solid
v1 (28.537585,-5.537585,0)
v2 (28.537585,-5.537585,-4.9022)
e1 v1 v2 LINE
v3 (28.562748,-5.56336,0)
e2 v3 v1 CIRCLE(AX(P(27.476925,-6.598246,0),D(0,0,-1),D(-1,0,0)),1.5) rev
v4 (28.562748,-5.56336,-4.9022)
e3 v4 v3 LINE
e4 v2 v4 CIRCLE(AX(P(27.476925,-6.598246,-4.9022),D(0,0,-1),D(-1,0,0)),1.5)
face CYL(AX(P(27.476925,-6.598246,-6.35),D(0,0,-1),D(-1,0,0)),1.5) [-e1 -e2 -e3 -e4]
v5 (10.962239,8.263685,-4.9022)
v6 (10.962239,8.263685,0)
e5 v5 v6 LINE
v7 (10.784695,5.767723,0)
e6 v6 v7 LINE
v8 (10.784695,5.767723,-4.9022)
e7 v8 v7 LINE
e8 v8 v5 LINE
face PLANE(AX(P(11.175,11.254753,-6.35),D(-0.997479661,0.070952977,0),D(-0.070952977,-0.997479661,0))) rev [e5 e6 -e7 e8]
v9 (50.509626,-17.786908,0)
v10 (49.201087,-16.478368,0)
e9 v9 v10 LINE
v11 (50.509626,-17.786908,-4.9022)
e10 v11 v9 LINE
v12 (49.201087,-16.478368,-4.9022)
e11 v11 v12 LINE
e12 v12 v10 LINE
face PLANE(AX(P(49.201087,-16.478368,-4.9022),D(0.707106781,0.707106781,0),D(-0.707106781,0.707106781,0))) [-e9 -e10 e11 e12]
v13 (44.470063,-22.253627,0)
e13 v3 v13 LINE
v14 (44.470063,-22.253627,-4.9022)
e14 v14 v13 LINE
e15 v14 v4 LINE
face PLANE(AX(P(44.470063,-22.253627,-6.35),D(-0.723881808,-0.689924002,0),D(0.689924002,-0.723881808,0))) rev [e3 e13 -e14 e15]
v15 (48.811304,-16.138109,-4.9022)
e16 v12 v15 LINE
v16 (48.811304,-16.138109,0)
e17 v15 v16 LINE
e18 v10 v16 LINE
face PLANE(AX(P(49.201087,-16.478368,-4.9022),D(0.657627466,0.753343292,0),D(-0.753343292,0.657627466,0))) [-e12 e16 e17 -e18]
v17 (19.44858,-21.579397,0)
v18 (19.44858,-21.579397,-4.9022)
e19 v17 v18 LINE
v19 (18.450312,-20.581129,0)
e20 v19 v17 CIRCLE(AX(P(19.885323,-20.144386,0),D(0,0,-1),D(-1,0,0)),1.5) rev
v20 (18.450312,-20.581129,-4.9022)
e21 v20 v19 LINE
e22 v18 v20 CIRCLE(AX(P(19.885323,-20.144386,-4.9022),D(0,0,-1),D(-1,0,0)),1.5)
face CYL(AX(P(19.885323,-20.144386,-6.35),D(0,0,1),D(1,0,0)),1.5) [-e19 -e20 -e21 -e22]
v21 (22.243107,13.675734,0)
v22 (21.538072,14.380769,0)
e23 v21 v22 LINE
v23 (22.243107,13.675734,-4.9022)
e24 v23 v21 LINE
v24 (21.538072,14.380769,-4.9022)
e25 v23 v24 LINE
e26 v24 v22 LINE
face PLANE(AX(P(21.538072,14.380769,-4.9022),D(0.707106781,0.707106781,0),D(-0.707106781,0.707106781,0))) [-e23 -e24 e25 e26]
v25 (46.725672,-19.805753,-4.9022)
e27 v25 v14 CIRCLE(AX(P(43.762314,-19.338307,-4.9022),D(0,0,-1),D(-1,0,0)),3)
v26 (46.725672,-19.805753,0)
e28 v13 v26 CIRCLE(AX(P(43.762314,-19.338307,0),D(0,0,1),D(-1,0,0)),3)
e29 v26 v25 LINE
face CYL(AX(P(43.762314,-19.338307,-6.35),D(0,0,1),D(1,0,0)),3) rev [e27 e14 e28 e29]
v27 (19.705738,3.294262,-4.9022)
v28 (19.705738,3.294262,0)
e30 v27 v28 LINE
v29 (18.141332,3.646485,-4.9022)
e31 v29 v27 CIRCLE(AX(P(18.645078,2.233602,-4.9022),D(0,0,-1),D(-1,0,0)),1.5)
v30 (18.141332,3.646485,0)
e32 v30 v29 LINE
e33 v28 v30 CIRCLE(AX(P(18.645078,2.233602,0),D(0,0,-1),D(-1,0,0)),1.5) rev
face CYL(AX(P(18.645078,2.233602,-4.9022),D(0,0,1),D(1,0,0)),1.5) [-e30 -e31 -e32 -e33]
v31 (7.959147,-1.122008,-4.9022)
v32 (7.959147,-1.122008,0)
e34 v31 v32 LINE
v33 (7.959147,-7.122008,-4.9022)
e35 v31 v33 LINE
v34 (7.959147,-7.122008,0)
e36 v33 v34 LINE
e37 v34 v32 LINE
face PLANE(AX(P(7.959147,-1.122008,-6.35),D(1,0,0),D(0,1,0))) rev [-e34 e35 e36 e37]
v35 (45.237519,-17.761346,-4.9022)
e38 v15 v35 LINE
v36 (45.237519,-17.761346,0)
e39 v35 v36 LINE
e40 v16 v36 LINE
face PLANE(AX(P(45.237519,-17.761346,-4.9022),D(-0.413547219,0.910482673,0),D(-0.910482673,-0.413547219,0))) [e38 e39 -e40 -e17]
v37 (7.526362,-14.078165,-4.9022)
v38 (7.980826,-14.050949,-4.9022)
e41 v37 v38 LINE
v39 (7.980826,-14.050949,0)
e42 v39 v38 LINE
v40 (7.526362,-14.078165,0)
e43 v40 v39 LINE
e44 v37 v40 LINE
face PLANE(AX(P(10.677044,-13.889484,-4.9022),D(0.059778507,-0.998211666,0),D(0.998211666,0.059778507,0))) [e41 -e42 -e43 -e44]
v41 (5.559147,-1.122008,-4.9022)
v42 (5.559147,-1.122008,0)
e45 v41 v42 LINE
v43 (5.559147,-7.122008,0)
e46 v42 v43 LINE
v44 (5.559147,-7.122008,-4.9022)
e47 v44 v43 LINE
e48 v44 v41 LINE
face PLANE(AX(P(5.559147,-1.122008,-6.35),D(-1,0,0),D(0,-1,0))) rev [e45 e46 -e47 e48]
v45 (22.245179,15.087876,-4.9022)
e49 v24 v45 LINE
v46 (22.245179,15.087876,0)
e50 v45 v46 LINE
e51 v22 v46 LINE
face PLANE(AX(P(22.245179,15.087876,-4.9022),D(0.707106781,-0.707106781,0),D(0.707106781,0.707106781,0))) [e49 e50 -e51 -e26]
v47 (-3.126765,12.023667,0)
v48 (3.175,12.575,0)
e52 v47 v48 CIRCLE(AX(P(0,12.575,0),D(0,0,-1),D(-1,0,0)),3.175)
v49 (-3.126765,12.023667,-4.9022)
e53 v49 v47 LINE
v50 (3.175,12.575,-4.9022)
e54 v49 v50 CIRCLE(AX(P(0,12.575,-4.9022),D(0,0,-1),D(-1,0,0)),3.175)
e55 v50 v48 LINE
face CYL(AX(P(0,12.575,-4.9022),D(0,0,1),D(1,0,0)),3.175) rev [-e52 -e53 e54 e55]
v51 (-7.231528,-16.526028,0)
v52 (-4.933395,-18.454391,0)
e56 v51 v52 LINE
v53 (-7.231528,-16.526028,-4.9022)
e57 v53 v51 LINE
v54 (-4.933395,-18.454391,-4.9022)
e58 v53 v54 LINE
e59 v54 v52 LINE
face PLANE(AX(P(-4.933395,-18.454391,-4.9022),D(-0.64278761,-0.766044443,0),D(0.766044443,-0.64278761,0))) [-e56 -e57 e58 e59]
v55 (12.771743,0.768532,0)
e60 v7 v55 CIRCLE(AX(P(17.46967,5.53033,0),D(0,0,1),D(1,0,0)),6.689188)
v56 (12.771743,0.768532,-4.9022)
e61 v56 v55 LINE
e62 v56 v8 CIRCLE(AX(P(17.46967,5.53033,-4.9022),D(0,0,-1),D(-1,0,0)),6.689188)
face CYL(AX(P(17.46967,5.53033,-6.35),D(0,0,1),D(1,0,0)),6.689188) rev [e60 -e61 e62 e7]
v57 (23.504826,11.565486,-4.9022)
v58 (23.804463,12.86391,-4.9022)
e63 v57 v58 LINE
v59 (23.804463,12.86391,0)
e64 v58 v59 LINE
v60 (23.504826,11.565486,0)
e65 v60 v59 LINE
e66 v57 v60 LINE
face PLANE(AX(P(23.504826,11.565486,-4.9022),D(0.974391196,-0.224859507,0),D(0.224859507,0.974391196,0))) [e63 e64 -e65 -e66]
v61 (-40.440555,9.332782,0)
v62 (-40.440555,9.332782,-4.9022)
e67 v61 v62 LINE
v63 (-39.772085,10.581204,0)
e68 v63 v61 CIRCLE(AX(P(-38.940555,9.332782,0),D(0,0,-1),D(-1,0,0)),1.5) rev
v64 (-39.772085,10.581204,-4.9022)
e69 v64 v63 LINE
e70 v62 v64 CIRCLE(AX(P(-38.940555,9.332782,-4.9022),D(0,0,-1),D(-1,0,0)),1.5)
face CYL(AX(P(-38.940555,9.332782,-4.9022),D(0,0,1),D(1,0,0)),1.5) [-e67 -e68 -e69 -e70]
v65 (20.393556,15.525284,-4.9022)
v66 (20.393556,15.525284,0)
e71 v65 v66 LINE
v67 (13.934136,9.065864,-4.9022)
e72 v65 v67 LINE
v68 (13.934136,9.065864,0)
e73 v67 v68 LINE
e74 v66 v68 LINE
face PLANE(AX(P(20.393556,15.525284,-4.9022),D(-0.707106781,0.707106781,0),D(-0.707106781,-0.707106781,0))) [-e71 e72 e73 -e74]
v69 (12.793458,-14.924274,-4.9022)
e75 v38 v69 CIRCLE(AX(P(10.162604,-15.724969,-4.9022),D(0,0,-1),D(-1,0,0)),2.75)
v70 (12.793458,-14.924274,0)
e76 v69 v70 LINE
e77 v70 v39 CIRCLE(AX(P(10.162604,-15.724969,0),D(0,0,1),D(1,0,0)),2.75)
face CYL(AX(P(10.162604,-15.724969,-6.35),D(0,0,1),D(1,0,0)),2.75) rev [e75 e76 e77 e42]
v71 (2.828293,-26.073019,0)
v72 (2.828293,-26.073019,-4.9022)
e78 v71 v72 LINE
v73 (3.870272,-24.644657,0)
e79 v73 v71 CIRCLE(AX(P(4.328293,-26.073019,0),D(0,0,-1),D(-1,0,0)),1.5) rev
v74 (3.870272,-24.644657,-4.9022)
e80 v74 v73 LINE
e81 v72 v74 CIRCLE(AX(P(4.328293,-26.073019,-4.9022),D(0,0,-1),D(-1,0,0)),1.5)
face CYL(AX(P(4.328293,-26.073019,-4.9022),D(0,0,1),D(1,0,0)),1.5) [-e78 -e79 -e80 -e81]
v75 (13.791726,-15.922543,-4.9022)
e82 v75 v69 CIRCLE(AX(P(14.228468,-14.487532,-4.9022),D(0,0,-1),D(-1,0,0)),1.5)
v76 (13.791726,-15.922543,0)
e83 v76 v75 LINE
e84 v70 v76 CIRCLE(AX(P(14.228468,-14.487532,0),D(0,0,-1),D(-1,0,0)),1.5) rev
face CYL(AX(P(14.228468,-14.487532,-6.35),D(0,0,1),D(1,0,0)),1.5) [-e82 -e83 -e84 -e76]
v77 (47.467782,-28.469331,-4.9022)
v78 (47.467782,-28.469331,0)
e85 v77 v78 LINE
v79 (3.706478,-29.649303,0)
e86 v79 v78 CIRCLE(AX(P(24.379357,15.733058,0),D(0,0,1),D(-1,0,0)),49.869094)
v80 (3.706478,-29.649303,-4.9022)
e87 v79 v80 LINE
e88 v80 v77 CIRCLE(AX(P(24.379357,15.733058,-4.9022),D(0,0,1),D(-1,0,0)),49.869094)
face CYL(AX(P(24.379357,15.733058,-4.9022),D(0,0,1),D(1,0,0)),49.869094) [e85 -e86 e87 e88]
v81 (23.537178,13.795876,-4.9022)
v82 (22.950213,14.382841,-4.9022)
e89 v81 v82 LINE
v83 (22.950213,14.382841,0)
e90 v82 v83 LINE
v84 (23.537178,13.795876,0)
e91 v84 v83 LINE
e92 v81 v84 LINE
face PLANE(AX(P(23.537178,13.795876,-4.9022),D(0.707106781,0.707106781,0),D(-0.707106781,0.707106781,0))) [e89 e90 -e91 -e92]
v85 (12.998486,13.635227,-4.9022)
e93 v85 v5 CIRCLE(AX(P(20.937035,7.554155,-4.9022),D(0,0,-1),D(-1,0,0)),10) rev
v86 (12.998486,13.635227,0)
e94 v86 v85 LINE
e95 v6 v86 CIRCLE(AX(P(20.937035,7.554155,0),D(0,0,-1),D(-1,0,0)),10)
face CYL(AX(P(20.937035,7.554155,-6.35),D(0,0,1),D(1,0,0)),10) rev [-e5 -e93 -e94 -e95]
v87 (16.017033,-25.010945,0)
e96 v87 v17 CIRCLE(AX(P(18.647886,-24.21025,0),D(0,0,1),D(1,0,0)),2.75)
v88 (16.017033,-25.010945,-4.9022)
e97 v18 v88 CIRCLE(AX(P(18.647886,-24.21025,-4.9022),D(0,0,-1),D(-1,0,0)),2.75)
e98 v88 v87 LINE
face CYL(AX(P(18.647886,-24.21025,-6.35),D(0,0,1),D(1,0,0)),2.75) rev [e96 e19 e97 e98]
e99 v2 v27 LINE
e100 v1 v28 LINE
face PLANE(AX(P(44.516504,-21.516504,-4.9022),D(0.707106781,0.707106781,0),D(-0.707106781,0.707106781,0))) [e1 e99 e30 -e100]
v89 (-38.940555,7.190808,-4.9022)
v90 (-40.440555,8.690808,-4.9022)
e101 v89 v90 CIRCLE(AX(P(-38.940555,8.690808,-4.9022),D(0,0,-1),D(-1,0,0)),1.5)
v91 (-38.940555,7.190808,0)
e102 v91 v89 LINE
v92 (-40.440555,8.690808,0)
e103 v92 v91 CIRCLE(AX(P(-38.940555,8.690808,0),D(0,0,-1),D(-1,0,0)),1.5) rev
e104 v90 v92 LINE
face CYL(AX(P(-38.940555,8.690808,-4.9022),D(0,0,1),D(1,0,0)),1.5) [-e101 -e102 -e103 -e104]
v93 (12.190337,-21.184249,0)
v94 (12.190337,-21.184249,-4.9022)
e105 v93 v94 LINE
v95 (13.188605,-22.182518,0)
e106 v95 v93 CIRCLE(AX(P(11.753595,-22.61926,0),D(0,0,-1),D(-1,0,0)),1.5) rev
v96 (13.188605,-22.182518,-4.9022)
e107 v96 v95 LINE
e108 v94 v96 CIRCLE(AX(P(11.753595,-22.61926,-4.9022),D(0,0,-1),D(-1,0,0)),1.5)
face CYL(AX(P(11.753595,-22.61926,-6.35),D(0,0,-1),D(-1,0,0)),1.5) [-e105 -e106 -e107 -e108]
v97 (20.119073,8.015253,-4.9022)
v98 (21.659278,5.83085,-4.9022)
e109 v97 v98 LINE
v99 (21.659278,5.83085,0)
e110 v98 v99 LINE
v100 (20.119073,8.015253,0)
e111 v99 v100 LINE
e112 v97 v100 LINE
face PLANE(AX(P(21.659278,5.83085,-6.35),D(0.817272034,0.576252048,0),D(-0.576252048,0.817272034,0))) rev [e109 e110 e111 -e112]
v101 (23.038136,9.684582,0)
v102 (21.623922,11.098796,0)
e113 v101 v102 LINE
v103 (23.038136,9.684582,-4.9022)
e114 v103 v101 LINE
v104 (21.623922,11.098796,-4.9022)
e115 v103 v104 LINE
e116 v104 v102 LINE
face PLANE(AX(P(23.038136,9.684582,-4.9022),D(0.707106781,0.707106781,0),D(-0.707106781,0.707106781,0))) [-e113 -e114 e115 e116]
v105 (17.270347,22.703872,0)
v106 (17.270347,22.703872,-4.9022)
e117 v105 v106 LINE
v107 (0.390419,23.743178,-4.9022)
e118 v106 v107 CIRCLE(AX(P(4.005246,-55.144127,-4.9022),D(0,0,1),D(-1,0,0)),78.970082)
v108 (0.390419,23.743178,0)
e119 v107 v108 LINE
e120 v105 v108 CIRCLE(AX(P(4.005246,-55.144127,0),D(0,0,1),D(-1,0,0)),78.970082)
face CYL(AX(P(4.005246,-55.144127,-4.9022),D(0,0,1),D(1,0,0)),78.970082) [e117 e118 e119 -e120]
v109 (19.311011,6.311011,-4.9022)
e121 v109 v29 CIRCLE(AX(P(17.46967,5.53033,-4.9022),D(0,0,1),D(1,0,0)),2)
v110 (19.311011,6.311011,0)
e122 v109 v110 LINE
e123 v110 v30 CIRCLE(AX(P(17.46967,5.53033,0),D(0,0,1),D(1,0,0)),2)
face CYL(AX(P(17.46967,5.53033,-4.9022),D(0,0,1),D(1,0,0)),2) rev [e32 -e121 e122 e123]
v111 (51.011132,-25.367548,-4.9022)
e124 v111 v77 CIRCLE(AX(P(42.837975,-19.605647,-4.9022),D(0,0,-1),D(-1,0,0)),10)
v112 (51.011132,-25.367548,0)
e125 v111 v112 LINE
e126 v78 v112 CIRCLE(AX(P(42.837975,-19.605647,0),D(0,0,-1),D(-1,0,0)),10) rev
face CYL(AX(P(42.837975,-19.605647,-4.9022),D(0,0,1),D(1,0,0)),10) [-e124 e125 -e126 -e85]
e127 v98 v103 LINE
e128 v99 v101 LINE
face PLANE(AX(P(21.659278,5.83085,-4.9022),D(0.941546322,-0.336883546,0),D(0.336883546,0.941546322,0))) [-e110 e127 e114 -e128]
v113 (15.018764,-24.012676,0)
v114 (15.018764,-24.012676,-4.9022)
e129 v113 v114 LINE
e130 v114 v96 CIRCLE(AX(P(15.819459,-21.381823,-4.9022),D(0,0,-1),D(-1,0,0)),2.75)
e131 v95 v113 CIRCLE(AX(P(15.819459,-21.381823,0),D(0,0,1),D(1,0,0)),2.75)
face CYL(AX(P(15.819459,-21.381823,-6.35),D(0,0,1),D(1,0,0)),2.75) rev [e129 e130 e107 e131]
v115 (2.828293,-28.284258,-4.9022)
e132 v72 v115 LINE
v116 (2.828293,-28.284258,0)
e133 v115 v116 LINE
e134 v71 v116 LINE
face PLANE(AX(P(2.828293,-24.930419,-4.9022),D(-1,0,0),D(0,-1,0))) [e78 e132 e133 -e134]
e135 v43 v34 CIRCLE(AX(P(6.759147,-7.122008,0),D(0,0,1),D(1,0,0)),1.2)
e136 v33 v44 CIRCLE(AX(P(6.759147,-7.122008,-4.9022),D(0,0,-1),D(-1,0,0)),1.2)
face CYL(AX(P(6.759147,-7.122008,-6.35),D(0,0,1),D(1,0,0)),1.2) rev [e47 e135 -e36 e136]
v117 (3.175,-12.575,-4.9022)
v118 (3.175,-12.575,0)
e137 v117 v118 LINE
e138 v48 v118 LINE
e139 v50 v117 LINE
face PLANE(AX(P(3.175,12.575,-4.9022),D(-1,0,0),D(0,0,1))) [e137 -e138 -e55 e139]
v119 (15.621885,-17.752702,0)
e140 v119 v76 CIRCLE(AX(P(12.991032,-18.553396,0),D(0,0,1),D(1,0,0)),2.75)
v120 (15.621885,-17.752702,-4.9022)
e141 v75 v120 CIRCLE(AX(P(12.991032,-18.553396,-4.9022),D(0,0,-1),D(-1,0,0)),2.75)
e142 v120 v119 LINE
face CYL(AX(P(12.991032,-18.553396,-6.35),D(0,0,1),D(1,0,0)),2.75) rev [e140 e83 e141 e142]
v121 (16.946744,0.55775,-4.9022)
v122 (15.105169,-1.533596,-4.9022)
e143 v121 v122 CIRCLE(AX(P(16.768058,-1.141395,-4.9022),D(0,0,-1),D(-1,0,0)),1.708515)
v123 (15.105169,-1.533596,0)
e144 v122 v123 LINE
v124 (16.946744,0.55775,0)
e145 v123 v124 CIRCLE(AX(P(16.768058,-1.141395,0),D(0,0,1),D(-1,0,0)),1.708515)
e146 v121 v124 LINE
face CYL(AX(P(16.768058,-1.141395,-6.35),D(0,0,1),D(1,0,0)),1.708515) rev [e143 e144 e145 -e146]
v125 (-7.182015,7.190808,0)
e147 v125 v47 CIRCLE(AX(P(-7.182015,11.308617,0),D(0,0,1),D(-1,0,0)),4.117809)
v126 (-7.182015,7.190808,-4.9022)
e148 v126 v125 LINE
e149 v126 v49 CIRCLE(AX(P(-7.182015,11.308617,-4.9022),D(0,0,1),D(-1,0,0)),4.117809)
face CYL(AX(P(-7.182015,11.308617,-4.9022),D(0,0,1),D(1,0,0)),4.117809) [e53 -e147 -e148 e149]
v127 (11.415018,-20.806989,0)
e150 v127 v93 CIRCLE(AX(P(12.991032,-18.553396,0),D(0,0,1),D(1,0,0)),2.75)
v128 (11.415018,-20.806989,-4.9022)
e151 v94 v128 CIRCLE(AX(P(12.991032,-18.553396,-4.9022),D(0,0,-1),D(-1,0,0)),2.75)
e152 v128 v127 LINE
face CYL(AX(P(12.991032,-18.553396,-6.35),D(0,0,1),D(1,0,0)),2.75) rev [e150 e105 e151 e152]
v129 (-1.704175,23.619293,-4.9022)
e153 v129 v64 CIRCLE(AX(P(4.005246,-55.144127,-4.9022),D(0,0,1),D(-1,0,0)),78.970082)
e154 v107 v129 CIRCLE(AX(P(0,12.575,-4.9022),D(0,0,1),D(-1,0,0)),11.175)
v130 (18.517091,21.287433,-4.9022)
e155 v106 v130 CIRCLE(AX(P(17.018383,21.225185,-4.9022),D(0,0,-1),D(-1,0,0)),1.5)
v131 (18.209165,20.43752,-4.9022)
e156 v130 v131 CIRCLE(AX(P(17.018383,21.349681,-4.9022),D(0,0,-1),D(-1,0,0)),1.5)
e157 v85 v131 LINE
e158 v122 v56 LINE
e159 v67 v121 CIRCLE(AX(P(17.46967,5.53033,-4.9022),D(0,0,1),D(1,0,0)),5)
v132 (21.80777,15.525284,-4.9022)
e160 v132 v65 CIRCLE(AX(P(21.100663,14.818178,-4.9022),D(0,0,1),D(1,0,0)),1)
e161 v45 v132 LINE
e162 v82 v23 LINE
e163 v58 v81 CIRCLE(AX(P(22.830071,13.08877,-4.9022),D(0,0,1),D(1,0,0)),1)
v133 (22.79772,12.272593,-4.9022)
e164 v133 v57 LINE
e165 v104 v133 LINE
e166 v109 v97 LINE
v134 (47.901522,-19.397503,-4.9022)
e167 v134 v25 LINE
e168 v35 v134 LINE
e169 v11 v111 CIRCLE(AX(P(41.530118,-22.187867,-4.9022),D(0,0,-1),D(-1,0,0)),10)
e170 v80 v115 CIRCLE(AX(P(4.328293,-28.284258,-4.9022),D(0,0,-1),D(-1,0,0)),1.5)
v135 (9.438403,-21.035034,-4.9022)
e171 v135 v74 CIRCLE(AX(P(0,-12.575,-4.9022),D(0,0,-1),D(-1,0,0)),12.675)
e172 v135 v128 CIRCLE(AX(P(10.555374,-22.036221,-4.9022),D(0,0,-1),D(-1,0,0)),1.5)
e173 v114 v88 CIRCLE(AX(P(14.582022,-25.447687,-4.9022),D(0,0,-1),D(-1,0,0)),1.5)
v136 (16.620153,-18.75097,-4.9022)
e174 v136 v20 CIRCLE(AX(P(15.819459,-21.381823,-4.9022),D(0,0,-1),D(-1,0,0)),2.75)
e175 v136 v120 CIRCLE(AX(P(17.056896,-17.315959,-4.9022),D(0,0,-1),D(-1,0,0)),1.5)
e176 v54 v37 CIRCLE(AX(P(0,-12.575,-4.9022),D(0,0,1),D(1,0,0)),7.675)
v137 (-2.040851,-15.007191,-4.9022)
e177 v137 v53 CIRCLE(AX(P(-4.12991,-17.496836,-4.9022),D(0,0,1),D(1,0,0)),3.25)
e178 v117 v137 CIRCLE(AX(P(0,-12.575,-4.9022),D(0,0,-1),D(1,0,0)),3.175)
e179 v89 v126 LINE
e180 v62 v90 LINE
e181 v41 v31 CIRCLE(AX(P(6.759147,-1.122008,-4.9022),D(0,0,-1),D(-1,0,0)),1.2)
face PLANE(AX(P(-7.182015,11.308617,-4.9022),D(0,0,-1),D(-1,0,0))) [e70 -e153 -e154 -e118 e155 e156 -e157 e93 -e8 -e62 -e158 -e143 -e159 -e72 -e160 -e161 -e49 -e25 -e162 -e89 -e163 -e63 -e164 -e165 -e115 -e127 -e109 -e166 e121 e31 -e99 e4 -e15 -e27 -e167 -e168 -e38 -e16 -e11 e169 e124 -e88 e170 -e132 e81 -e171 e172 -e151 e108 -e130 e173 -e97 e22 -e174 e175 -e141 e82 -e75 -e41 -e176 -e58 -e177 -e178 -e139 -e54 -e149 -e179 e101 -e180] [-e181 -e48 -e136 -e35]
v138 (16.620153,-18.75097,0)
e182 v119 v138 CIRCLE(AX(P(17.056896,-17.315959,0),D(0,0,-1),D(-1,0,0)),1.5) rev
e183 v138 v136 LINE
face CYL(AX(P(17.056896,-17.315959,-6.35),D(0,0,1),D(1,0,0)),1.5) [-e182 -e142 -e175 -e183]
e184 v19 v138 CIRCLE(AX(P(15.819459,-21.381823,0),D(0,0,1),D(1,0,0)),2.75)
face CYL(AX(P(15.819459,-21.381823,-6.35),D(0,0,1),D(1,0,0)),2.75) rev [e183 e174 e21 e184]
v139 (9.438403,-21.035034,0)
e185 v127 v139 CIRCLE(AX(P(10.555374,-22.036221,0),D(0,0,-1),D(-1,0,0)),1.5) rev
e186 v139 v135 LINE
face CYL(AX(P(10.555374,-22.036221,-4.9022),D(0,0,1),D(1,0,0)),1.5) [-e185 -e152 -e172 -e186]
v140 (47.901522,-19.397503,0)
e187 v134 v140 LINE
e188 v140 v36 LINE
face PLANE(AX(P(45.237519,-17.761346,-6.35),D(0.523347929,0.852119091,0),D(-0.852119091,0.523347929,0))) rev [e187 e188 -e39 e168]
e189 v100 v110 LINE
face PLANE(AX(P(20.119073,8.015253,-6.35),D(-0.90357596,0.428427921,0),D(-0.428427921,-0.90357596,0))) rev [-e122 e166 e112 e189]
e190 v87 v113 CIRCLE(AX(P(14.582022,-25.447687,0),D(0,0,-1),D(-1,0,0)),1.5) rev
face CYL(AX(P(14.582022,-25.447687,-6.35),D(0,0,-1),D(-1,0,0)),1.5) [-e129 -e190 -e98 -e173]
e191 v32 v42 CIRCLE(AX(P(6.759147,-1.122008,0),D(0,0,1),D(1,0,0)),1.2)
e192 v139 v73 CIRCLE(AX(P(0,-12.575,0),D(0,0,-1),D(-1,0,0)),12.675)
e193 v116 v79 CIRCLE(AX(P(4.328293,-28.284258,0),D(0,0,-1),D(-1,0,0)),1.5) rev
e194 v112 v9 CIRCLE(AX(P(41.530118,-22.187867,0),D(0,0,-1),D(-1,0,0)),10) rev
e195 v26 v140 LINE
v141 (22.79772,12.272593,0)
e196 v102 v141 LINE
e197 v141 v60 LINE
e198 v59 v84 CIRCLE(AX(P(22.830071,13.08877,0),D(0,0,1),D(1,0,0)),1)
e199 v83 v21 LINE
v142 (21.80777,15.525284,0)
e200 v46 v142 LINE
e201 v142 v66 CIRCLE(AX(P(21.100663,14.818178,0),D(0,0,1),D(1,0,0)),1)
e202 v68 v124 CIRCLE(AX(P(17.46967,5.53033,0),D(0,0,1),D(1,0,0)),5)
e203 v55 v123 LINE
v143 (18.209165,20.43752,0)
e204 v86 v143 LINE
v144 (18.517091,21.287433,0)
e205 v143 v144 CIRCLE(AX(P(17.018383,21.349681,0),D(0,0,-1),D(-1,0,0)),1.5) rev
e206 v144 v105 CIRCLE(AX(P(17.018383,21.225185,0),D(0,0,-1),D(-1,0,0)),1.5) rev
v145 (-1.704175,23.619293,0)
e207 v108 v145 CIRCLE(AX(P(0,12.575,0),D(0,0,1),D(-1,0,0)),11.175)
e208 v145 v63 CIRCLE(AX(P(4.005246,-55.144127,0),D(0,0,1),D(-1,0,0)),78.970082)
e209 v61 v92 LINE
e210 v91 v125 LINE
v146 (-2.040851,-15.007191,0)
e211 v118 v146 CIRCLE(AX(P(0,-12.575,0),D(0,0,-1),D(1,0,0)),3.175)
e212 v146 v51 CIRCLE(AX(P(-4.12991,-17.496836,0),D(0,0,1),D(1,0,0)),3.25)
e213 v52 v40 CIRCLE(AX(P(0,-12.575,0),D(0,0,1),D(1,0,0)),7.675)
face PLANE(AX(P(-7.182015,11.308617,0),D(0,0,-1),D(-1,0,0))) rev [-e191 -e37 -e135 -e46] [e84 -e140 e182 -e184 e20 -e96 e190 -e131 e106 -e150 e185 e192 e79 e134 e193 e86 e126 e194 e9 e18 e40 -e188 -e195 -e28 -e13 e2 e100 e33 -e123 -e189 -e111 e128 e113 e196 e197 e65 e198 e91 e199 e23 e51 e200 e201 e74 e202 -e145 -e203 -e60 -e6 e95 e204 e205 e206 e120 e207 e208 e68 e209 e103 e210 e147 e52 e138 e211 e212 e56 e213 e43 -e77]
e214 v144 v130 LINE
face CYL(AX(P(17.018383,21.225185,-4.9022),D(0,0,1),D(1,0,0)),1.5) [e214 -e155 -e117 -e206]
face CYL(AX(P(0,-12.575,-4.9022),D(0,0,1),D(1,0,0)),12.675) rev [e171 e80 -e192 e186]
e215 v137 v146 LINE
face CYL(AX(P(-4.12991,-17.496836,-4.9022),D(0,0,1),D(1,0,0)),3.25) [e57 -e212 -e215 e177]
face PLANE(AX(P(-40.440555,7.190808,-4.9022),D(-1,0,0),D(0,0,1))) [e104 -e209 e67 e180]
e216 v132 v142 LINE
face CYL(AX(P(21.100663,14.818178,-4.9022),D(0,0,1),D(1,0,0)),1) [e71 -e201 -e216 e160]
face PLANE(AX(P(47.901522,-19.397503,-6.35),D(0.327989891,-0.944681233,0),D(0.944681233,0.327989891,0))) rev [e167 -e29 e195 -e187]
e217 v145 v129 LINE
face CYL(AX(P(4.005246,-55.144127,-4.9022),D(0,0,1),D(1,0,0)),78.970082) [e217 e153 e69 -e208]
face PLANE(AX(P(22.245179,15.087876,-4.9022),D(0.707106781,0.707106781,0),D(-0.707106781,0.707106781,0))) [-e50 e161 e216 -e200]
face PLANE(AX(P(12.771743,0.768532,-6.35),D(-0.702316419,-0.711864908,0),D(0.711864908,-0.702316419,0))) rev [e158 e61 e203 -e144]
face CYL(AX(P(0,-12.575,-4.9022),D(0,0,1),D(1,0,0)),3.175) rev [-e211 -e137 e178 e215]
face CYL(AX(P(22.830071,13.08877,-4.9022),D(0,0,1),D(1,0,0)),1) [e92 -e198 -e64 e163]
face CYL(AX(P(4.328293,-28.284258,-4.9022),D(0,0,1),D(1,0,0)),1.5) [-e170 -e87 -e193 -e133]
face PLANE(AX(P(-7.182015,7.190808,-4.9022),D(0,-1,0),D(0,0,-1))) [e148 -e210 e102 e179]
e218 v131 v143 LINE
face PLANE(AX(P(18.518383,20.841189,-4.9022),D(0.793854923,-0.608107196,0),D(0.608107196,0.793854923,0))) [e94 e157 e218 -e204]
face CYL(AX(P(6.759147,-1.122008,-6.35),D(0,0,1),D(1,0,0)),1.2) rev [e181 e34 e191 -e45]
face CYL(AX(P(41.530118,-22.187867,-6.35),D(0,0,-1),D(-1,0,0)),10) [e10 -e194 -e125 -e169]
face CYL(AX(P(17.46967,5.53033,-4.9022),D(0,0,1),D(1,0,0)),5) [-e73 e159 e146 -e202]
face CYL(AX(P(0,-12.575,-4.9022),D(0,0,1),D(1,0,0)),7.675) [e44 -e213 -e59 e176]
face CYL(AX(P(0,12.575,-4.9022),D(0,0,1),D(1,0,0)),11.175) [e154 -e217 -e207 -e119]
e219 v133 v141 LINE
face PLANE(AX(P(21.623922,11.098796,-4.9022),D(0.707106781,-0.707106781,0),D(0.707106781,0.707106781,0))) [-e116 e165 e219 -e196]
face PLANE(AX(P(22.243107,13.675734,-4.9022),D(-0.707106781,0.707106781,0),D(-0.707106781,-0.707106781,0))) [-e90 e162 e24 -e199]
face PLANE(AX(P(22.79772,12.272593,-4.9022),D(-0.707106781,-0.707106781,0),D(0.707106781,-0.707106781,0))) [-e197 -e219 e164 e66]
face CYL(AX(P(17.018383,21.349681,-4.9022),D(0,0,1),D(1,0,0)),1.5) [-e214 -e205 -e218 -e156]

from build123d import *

# Parameters (mm, degrees)
CART_CLIP_DEPTH                    = 4.9022
DEVICE_CLIP_DEPTH                  = 4.9022
JOINT_DEPTH                        = 4.9022
JOINT_FILLETS_R                    = 1
DEVICE_CLIP_FLEX_RELIEF_GEOMETRY_R = 2
DEVICE_CLIP_FLEX_RELIEF_DEPTH      = 62.785838519
SNAP_IN_RELIEF_DEPTH               = 6.35
BOTTOM_BEEFUP_DEPTH                = 4.9022
CABLE_HOLE_R                       = 2.75
CABLE_HOLE_CUT_DEPTH               = 6.35
SHELF_TAIL_DEPTH                   = 4.9022
FRONT_TAB_BEEF_DEPTH               = 4.9022
TOP_CURVE_EXTRUSION_DEPTH          = 4.9022
LPATTERN1_COUNT                    = 4
LPATTERN1_PITCH                    = 4
POSCON_BOTTOM_SNAPBEEF_DEPTH       = 4.9022
POSCON_TOP_CLIP_FLEX_RELIEF_DEPTH  = 6.35
ZIP_TIE_SLOT_DEPTH                 = 6.35
POSCON_BOTTOM_SNAP_RELIEF_DEPTH    = 6.35
SMALL_FILLET_R                     = 1.5
POSCON_TOP_SNAP_RELIEF_DEPTH       = 6.35
LARGE_FILLET_R                     = 10


with BuildPart() as part:
    # Cart Clip Geometry → Cart Clip (new body)
    with BuildSketch(Plane.XY):
        with BuildLine():
            Line((11.175, 4.575), (7.675, -8.575))
            Line((7.675, -8.575), (7.675, -12.575))
            ThreePointArc((7.675, -12.575), (3.243595159, -19.530912266), (-4.933394904, -18.454391101))
            Line((-4.933394904, -18.454391101), (-7.231528234, -16.526028272))
            ThreePointArc((-7.231528234, -16.526028272), (-5.042617938, -14.377626523), (-2.040850661, -15.007191107))
            ThreePointArc((-2.040850661, -15.007191107), (1.341812981, -15.452527224), (3.175, -12.575))
            Line((3.175, -12.575), (3.175, 12.575))
            ThreePointArc((3.175, 12.575), (-0.276719483, 15.737918166), (-3.126764616, 12.023667036))
            ThreePointArc((-3.126764616, 12.023667036), (-5.791346514, 7.43274359), (-10.766819067, 9.282405083))
            Line((-10.766819067, 9.282405083), (-11.00522664, 10.634481615))
            ThreePointArc((-11.00522664, 10.634481615), (-0.973965425, 23.707475751), (11.175, 12.575))
            Line((11.175, 12.575), (11.175, 4.575))
        make_face()
    extrude(amount=-CART_CLIP_DEPTH)



with BuildPart() as body_2:
    # Device Clip Geometry → Device Clip (new body)
    with BuildSketch(Plane.XY):
        with BuildLine():
            Line((22.245178849, 15.087875605), (21.538072068, 14.380768824))
            Line((21.538072068, 14.380768824), (22.243106562, 13.67573433))
            Line((22.243106562, 13.67573433), (22.950213344, 14.382841111))
            Line((22.950213344, 14.382841111), (23.537178094, 13.79587636))
            ThreePointArc((23.537178094, 13.79587636), (23.791320059, 13.364452092), (23.804462509, 12.863910072))
            Line((23.804462509, 12.863910072), (23.504826292, 11.565486463))
            Line((23.504826292, 11.565486463), (22.79771951, 12.272593245))
            Line((22.79771951, 12.272593245), (21.623922254, 11.098795988))
            Line((21.623922254, 11.098795988), (23.038135816, 9.684582425))
            Line((23.038135816, 9.684582425), (21.659277593, 5.830850468))
            Line((21.659277593, 5.830850468), (20.24506403, 7.24506403))
            Line((20.24506403, 7.24506403), (18, 5))
            Line((18, 5), (44.516504294, -21.516504294))
            Line((44.516504294, -21.516504294), (46.761568325, -19.271440264))
            Line((46.761568325, -19.271440264), (45.347354762, -17.857226702))
            Line((45.347354762, -17.857226702), (49.20108672, -16.478368479))
            Line((49.20108672, -16.478368479), (50.615300282, -17.892582041))
            Line((50.615300282, -17.892582041), (51.789097539, -16.718784784))
            Line((51.789097539, -16.718784784), (51.081990758, -16.011678003))
            Line((51.081990758, -16.011678003), (52.380414367, -15.712041786))
            ThreePointArc((52.380414367, -15.712041786), (52.880956387, -15.725184235), (53.312380655, -15.9793262))
            Line((53.312380655, -15.9793262), (53.899345406, -16.566290951))
            Line((53.899345406, -16.566290951), (53.192238624, -17.273397732))
            Line((53.192238624, -17.273397732), (53.897273119, -17.978432226))
            Line((53.897273119, -17.978432226), (54.6043799, -17.271325445))
            Line((54.6043799, -17.271325445), (55.041788732, -17.708734278))
            ThreePointArc((55.041788732, -17.708734278), (55.334681951, -18.415841059), (55.041788732, -19.12294784))
            Line((55.041788732, -19.12294784), (48.582368286, -25.582368286))
            ThreePointArc((48.582368286, -25.582368286), (45.04683438, -27.04683438), (41.511300474, -25.582368286))
            Line((41.511300474, -25.582368286), (13.934136008, 1.99479618))
            ThreePointArc((13.934136008, 1.99479618), (12.469669914, 5.530330086), (13.934136008, 9.065863992))
            Line((13.934136008, 9.065863992), (20.393556454, 15.525284438))
            ThreePointArc((20.393556454, 15.525284438), (21.100663236, 15.818177657), (21.807770017, 15.525284438))
            Line((21.807770017, 15.525284438), (22.245178849, 15.087875605))
        make_face()
    extrude(amount=-DEVICE_CLIP_DEPTH)


with BuildPart() as part_1:
    add(part.part)

    add(body_2.part)  # Joint merges body 2
    # Joint Geometry → Joint (add)
    with BuildSketch(Plane.XY):
        Polygon((7.675, -8.575), (41.511300474, -25.582368286), (13.934136008, 1.99479618), (11.175, 4.575), align=None)
    extrude(amount=-JOINT_DEPTH)

    # joint fillets
    # the kernel refuses this fillet: 1 mm, written as the material it adds along each edge
    with BuildSketch(Plane(origin=(7.675, -8.575, 0), x_dir=(0.8934828469815188, -0.4490973192413867, 0), z_dir=(0, 0, -1))) as joint_fillets_piece_1:
        with BuildLine():
            CenterArc((JOINT_FILLETS_R * 1.62185242183, JOINT_FILLETS_R), JOINT_FILLETS_R, 153.314216372, 116.685783628)
            Line((JOINT_FILLETS_R * 0.728369574849, JOINT_FILLETS_R * 1.44909731924), (0, 0))
            Line((0, 0), (JOINT_FILLETS_R * 1.62185242183, 0))
        make_face()
    extrude(amount=4.9022)
    with BuildSketch(Plane(origin=(41.511300474, -25.582368286, 0), x_dir=(-0.8934828469815294, 0.44909731924136564, 0), z_dir=(0, 0, -1))) as joint_fillets_piece_2:
        with BuildLine():
            CenterArc((0.153680417, -1), JOINT_FILLETS_R, 90, 16.706554242)
            ThreePointArc((-0.133789669, -0.042210383), (-0.066746785, -0.02157445), (0, 0))
            Line((0, 0), (0.153680417, 0))
        make_face()
    extrude(amount=4.9022)
    with BuildSketch(Plane(origin=(13.934136008, 1.99479618, 0), x_dir=(-0.7303933527208794, 0.6830267566509771, 0), z_dir=(0, 0, -1))) as joint_fillets_piece_3:
        with BuildLine():
            CenterArc((4.307177284, 1), JOINT_FILLETS_R, 138.225615508, 131.774384492)
            ThreePointArc((3.561403369, 1.66619912), (1.95135729, 0.468333164), (0, 0))
            Line((0, 0), (4.307177284, 0))
        make_face()
    extrude(amount=4.9022)
    with BuildSketch(Plane(origin=(11.175, 4.575, 0), x_dir=(0, 1, 0), z_dir=(0, 0, -1))) as joint_fillets_piece_4:
        with BuildLine():
            CenterArc((JOINT_FILLETS_R * 0.43397607901, JOINT_FILLETS_R), JOINT_FILLETS_R, 223.080619659, 46.919380341)
            Line((-JOINT_FILLETS_R * 0.296417273711, JOINT_FILLETS_R * 0.316973243349), (0, 0))
            Line((0, 0), (JOINT_FILLETS_R * 0.43397607901, 0))
        make_face()
    extrude(amount=4.9022)

    # Device Clip Flex Relief Geometry → Device Clip Flex Relief (cut, through all)
    with BuildSketch(Plane.XY):
        with Locations((17.469669914, 5.530330086)):
            Circle(DEVICE_CLIP_FLEX_RELIEF_GEOMETRY_R)
    extrude(amount=-DEVICE_CLIP_FLEX_RELIEF_DEPTH, mode=Mode.SUBTRACT)

    # Sketch5 → SNAP IN RELIEF (cut)
    with BuildSketch(Plane.XY):
        with BuildLine():
            Line((44.470063399, -22.25362726), (28.550321446, -5.550321446))
            Line((28.550321446, -5.550321446), (46.761568325, -19.271440264))
            ThreePointArc((46.761568325, -19.271440264), (46.141143244, -21.16619399), (44.470063399, -22.25362726))
        make_face()
    extrude(amount=-SNAP_IN_RELIEF_DEPTH, mode=Mode.SUBTRACT)

    # BOTTOM BEEFUP SKETCH → BOTTOM BEEFUP (add)
    with BuildSketch(Plane.XY):
        with BuildLine():
            Line((10.677043667, -13.889484035), (7.526361766, -14.078164518))
            Line((7.526361766, -14.078164518), (7.208614318, -8.772257329))
            Line((7.208614318, -8.772257329), (10.675, -9.282514389))
            Line((10.675, -9.282514389), (44.278748713, -25.488746112))
            Line((44.278748713, -25.488746112), (53.899345406, -16.566290951))
            Line((53.899345406, -16.566290951), (55.041788732, -17.708734278))
            ThreePointArc((55.041788732, -17.708734278), (55.966427661, -19.737585883), (55.333281386, -21.875416975))
            Line((55.333281386, -21.875416975), (50.398436239, -26.810262122))
            ThreePointArc((50.398436239, -26.810262122), (26.922067406, -34.071170743), (2.828292768, -29.238913377))
            Line((2.828292768, -29.238913377), (2.828292768, -24.930419257))
            ThreePointArc((2.828292768, -24.930419257), (8.371790669, -22.091761318), (11.894021473, -16.955397036))
            Line((11.894021473, -16.955397036), (10.677043667, -13.889484035))
        make_face()
    extrude(amount=-BOTTOM_BEEFUP_DEPTH)

    # CABLE HOLE → CABLE HOLE CUT (cut)
    with BuildSketch(Plane.XY):
        with Locations((10.162604388, -15.724968902)):
            Circle(CABLE_HOLE_R)
    cable_hole_cut = extrude(amount=-CABLE_HOLE_CUT_DEPTH, mode=Mode.SUBTRACT)

    # BOX SLIDE BEEF → SHELF TAIL (add)
    with BuildSketch(Plane.XY):
        Polygon((-7.182015159, 7.190807632), (-40.440555285, 7.190807632), (-40.440555285, 10.131018627), (-4.155347731, 22.948702822), align=None)
    extrude(amount=-SHELF_TAIL_DEPTH)

    # BEHIND TOP CLIP BEEF SKETCH → FRONT TAB BEEF (add)
    with BuildSketch(Plane.XY):
        Polygon((18.518382836, 20.841188896), (11.175, 11.254753066), (0.590090247, 23.734409415), (18.518382836, 22.48088631), align=None)
    extrude(amount=-FRONT_TAB_BEEF_DEPTH)

    # TOP CURVE → TOP CURVE EXTRUSION (add)
    with BuildSketch(Plane.XY):
        with BuildLine():
            Line((-40.440555285, 10.131018627), (-38.751141722, 8.751938886))
            Line((-38.751141722, 8.751938886), (0, 16.86846238))
            Line((0, 16.86846238), (13.175622622, 16.86846238))
            Line((13.175622622, 16.86846238), (18.518382836, 22.48088631))
            ThreePointArc((18.518382836, 22.48088631), (-12.184902527, 22.148517873), (-40.440555285, 10.131018627))
        make_face()
    extrude(amount=-TOP_CURVE_EXTRUSION_DEPTH)

    # LPattern1: CABLE HOLE CUT ×4
    with Locations(*[Vector(0.7071067811865482, -0.7071067811865469, 0) * (i * LPATTERN1_PITCH) for i in range(1, LPATTERN1_COUNT)]):
        add(cable_hole_cut, mode=Mode.SUBTRACT)

    # Sketch13 → POSCON BOTTOM SNAPBEEF (add)
    with BuildSketch(Plane.XY):
        Polygon((49.20108672, -16.478368479), (48.811303545, -16.138109098), (45.23751859, -17.761345734), (45.347354762, -17.857226702), align=None)
    extrude(amount=-POSCON_BOTTOM_SNAPBEEF_DEPTH)

    # Sketch14 → POSCON TOP CLIP FLEX RELIEF (cut)
    with BuildSketch(Plane.XY):
        with BuildLine():
            Line((12.771743003, 0.768531527), (15.105169217, -1.533595637))
            ThreePointArc((15.105169217, -1.533595637), (18.050301611, -2.270498232), (16.94674386, 0.557750439))
            ThreePointArc((16.94674386, 0.557750439), (15.316695608, 1.017603456), (13.933681531, 1.995250716))
            ThreePointArc((13.933681531, 1.995250716), (12.82864211, 3.669991158), (12.470969242, 5.644310734))
            Line((12.470969242, 5.644310734), (11.175, 11.254753066))
            Line((11.175, 11.254753066), (10.784695152, 5.767722626))
            ThreePointArc((10.784695152, 5.767722626), (11.253514306, 3.059570639), (12.771743003, 0.768531527))
        make_face()
    extrude(amount=-POSCON_TOP_CLIP_FLEX_RELIEF_DEPTH, mode=Mode.SUBTRACT)

    # Sketch15 → ZIP TIE SLOT (cut)
    with BuildSketch(Plane.XY):
        with BuildLine():
            Line((7.959147306, -1.122008403), (7.959147306, -7.122008403))
            ThreePointArc((7.959147306, -7.122008403), (6.759147306, -8.322008403), (5.559147306, -7.122008403))
            Line((5.559147306, -7.122008403), (5.559147306, -1.122008403))
            ThreePointArc((5.559147306, -1.122008403), (6.759147306, 0.077991597), (7.959147306, -1.122008403))
        make_face()
    extrude(amount=-ZIP_TIE_SLOT_DEPTH, mode=Mode.SUBTRACT)

    # Sketch16 → POSCON BOTTOM SNAP RELIEF (cut)
    with BuildSketch(Plane.XY):
        Polygon((45.23751859, -17.761345734), (47.901521822, -19.397502687), (45.962169994, -20.070838595), align=None)
        Polygon((41.374346961, -4.041292507), (53.040140925, -21.594507061), (50.398436239, -26.810262122), (52.008012569, -28.207638953), (59.817475223, -20.235408925), align=None)
    extrude(amount=-POSCON_BOTTOM_SNAP_RELIEF_DEPTH, mode=Mode.SUBTRACT)

    # SMALL FILLET
    # the kernel refuses this fillet: 1.5 mm, written as the material it takes off along each edge
    with BuildSketch(Plane(origin=(18.518382836, 20.841188896, 1.271229884), x_dir=(0, 1, 0), z_dir=(0, 0, -1))) as small_fillet_piece_1:
        with BuildLine():
            CenterArc((SMALL_FILLET_R * 0.338994635756, -SMALL_FILLET_R), SMALL_FILLET_R, 90, 37.452766395)
            Line((-SMALL_FILLET_R * 0.269112560318, -SMALL_FILLET_R * 0.206145077434), (0, 0))
            Line((0, 0), (SMALL_FILLET_R * 0.338994635756, 0))
        make_face()
    extrude(amount=7.444659768, mode=Mode.SUBTRACT)
    with BuildSketch(Plane(origin=(-40.440555285, 7.190807632, 3.75), x_dir=(1, 0, 0), z_dir=(0, 0, -1))) as small_fillet_piece_2:
        with BuildLine():
            CenterArc((SMALL_FILLET_R, -SMALL_FILLET_R), SMALL_FILLET_R, 90, 90)
            Line((0, -SMALL_FILLET_R), (0, 0))
            Line((0, 0), (SMALL_FILLET_R, 0))
        make_face()
    extrude(amount=12.4022, mode=Mode.SUBTRACT)
    with BuildSketch(Plane(origin=(12.911452732, -15.804547683, -7.122565694), x_dir=(0.9911354093588505, -0.13285556185220002, 0), z_dir=(0, 0, 1)), Plane(origin=(13.070610293, -21.30224437, -7.122565694), x_dir=(-0.9911354093588505, 0.1328555618522003, 0), z_dir=(0, 0, 1)), Plane(origin=(15.739879856, -18.632974807, -7.122565694), x_dir=(0.9911354093588505, -0.13285556185220002, 0), z_dir=(0, 0, 1)), Plane(origin=(15.899037418, -24.130671495, -7.122565694), x_dir=(-0.9911354093588505, 0.13285556185220002, 0), z_dir=(0, 0, 1)), Plane(origin=(18.568306981, -21.461401932, -7.122565694), x_dir=(0.9911354093588505, -0.1328555618522003, 0), z_dir=(0, 0, 1))) as small_fillet_piece_3:
        with BuildLine():
            CenterArc((1.130367989, 1.480313697), SMALL_FILLET_R, 204.56214871, 56.144973872)
            ThreePointArc((-0.233898388, 0.856793648), (-0.082131714, 0.437901741), (0, 0))
            ThreePointArc((0, 0), (0.444073139, 0.036091555), (0.888146277, 0))
        make_face()
    extrude(amount=9.342931387, mode=Mode.SUBTRACT)
    with BuildSketch(Plane(origin=(28.550321446, -5.550321446, 0.045028607), x_dir=(-0.707106781186794, 0.7071067811863009, 0), z_dir=(0, 0, -1))) as small_fillet_piece_4:
        with BuildLine():
            CenterArc((SMALL_FILLET_R * 0.012007628629, -SMALL_FILLET_R), SMALL_FILLET_R, 90, 1.37590676)
            Line((-SMALL_FILLET_R * 0.0120041665325, -SMALL_FILLET_R * 0.00028832471901), (0, 0))
            Line((0, 0), (SMALL_FILLET_R * 0.0120076286286, 0))
        make_face()
    extrude(amount=4.992257215, mode=Mode.SUBTRACT)
    with BuildSketch(Plane(origin=(18.883883476, 4.116116524, -7.80789415), x_dir=(-0.845154254728517, -0.5345224838248481, 0), z_dir=(0, 0, 1))) as small_fillet_piece_5:
        with BuildLine():
            CenterArc((1.208074074, 1.463368167), SMALL_FILLET_R, 192.688466763, 64.623066475)
            Line((-0.255294092, 1.133893419), (0, 0))
            ThreePointArc((0, 0), (0.439299663, 0.048842445), (0.878599327, 0))
        make_face()
    extrude(amount=10.713588301, mode=Mode.SUBTRACT)
    with BuildSketch(Plane(origin=(18.518382836, 22.48088631, 3.169498478), x_dir=(-0.9844109148420621, 0.17588391268053638, 0), z_dir=(0, 0, -1))) as small_fillet_piece_6:
        with BuildLine():
            CenterArc((1.255758761, -1.499951674), SMALL_FILLET_R, 89.540076871, 80.329822671)
            Line((-0.220857611, -1.236125805), (0, 0))
            ThreePointArc((0, 0), (0.633899696, 0.002544225), (1.267799391, 0))
        make_face()
    extrude(amount=11.241196956, mode=Mode.SUBTRACT)
    with BuildSketch(Plane(origin=(-40.440555285, 10.131018627, 2.0148186), x_dir=(0, -1, 0), z_dir=(0, 0, -1))) as small_fillet_piece_7:
        with BuildLine():
            CenterArc((0.798236635, -1.5), SMALL_FILLET_R, 90, 56.333812142)
            ThreePointArc((-0.450185479, -0.668469949), (-0.225945502, -0.333660676), (0, 0))
            Line((0, 0), (0.798236635, 0))
        make_face()
    extrude(amount=8.931837199, mode=Mode.SUBTRACT)
    with BuildSketch(Plane(origin=(2.828292768, -29.238913377, 2.423362243), x_dir=(0.9059578964296378, -0.4233677950633301, 0), z_dir=(0, 0, -1))) as small_fillet_piece_8:
        with BuildLine():
            CenterArc((0.954766556, -1.499929156), SMALL_FILLET_R, 89.443139617, 65.509466567)
            Line((-0.404170289, -0.864877463), (0, 0))
            ThreePointArc((0, 0), (0.484672449, 0.002355296), (0.969344897, 0))
        make_face()
    extrude(amount=9.748924486, mode=Mode.SUBTRACT)
    with BuildSketch(Plane(origin=(2.828292768, -24.930419257, 2.856498412), x_dir=(0, -1, 0), z_dir=(0, 0, -1))) as small_fillet_piece_9:
        with BuildLine():
            CenterArc((1.142599365, -1.5), SMALL_FILLET_R, 90, 72.220962593)
            ThreePointArc((-0.285762394, -1.041979601), (-0.131773474, -0.524036088), (0, 0))
            Line((0, 0), (1.142599365, 0))
        make_face()
    extrude(amount=10.615196824, mode=Mode.SUBTRACT)
    with BuildSketch(Plane(origin=(10.488001498, -19.692404694, -9.162708984), x_dir=(-0.6158879347432374, -0.7878337717042281, 0), z_dir=(0, 0, 1))) as small_fillet_piece_10:
        with BuildLine():
            CenterArc((1.805044043, 1.496606563), SMALL_FILLET_R, 183.050070351, 83.095200937)
            ThreePointArc((0.307168917, 1.416793616), (0.248625806, 0.687791303), (0, 0))
            ThreePointArc((0, 0), (0.852101797, 0.028674544), (1.704203594, 0))
        make_face()
    extrude(amount=13.423217968, mode=Mode.SUBTRACT)

    # Sketch12 → POSCON TOP SNAP RELIEF (cut)
    with BuildSketch(Plane.XY):
        Polygon((21.659277593, 5.830850468), (20.119072518, 8.015253176), (19.31101106, 6.31101106), align=None)
    extrude(amount=-POSCON_TOP_SNAP_RELIEF_DEPTH, mode=Mode.SUBTRACT)

    # LARGE FILLET
    # the kernel refuses this fillet: 10 mm, written as the material it adds along each edge
    with BuildSketch(Plane(origin=(11.175, 11.254753066, 0), x_dir=(0.6081071960741756, 0.7938549225663365, 0), z_dir=(0, 0, -1))) as large_fillet_piece_1:
        with BuildLine():
            CenterArc((LARGE_FILLET_R * 0.299862584786, LARGE_FILLET_R), LARGE_FILLET_R, 236.615958522, 33.384041478)
            Line((-LARGE_FILLET_R * 0.250385604815, LARGE_FILLET_R * 0.164998844408), (0, 0))
            Line((0, 0), (LARGE_FILLET_R * 0.299862584786, 0))
        make_face()
    extrude(amount=4.9022)
    # the kernel refuses this fillet: 10 mm, written as the material it takes off along each edge
    with BuildSketch(Plane(origin=(50.398436239, -26.810262122, 8.419191937), x_dir=(0.4518362349303937, 0.8921009005734306, 0), z_dir=(0, 0, -1))) as large_fillet_2_piece_1:
        with BuildLine():
            CenterArc((3.011153161, -10), LARGE_FILLET_R, 90, 35.558833916)
            ThreePointArc((-2.804233042, -1.86481203), (-1.417862433, -0.908727914), (0, 0))
            Line((0, 0), (3.011153161, 0))
        make_face()
    extrude(amount=21.740583873, mode=Mode.SUBTRACT)
    with BuildSketch(Plane(origin=(53.040140925, -21.594507061, 14.324954892), x_dir=(-0.5535056363381489, 0.8328454301621045, 0), z_dir=(0, 0, -1))) as large_fillet_2_piece_2:
        with BuildLine():
            CenterArc((5.87668539, -9.914497569), LARGE_FILLET_R, 97.497850744, 52.97155359)
            Line((-2.824240811, -4.985615014), (0, 0))
            Line((0, 0), (4.571795375, 0))
        make_face()
    extrude(amount=33.552109783, mode=Mode.SUBTRACT)


solid = part_1.part
